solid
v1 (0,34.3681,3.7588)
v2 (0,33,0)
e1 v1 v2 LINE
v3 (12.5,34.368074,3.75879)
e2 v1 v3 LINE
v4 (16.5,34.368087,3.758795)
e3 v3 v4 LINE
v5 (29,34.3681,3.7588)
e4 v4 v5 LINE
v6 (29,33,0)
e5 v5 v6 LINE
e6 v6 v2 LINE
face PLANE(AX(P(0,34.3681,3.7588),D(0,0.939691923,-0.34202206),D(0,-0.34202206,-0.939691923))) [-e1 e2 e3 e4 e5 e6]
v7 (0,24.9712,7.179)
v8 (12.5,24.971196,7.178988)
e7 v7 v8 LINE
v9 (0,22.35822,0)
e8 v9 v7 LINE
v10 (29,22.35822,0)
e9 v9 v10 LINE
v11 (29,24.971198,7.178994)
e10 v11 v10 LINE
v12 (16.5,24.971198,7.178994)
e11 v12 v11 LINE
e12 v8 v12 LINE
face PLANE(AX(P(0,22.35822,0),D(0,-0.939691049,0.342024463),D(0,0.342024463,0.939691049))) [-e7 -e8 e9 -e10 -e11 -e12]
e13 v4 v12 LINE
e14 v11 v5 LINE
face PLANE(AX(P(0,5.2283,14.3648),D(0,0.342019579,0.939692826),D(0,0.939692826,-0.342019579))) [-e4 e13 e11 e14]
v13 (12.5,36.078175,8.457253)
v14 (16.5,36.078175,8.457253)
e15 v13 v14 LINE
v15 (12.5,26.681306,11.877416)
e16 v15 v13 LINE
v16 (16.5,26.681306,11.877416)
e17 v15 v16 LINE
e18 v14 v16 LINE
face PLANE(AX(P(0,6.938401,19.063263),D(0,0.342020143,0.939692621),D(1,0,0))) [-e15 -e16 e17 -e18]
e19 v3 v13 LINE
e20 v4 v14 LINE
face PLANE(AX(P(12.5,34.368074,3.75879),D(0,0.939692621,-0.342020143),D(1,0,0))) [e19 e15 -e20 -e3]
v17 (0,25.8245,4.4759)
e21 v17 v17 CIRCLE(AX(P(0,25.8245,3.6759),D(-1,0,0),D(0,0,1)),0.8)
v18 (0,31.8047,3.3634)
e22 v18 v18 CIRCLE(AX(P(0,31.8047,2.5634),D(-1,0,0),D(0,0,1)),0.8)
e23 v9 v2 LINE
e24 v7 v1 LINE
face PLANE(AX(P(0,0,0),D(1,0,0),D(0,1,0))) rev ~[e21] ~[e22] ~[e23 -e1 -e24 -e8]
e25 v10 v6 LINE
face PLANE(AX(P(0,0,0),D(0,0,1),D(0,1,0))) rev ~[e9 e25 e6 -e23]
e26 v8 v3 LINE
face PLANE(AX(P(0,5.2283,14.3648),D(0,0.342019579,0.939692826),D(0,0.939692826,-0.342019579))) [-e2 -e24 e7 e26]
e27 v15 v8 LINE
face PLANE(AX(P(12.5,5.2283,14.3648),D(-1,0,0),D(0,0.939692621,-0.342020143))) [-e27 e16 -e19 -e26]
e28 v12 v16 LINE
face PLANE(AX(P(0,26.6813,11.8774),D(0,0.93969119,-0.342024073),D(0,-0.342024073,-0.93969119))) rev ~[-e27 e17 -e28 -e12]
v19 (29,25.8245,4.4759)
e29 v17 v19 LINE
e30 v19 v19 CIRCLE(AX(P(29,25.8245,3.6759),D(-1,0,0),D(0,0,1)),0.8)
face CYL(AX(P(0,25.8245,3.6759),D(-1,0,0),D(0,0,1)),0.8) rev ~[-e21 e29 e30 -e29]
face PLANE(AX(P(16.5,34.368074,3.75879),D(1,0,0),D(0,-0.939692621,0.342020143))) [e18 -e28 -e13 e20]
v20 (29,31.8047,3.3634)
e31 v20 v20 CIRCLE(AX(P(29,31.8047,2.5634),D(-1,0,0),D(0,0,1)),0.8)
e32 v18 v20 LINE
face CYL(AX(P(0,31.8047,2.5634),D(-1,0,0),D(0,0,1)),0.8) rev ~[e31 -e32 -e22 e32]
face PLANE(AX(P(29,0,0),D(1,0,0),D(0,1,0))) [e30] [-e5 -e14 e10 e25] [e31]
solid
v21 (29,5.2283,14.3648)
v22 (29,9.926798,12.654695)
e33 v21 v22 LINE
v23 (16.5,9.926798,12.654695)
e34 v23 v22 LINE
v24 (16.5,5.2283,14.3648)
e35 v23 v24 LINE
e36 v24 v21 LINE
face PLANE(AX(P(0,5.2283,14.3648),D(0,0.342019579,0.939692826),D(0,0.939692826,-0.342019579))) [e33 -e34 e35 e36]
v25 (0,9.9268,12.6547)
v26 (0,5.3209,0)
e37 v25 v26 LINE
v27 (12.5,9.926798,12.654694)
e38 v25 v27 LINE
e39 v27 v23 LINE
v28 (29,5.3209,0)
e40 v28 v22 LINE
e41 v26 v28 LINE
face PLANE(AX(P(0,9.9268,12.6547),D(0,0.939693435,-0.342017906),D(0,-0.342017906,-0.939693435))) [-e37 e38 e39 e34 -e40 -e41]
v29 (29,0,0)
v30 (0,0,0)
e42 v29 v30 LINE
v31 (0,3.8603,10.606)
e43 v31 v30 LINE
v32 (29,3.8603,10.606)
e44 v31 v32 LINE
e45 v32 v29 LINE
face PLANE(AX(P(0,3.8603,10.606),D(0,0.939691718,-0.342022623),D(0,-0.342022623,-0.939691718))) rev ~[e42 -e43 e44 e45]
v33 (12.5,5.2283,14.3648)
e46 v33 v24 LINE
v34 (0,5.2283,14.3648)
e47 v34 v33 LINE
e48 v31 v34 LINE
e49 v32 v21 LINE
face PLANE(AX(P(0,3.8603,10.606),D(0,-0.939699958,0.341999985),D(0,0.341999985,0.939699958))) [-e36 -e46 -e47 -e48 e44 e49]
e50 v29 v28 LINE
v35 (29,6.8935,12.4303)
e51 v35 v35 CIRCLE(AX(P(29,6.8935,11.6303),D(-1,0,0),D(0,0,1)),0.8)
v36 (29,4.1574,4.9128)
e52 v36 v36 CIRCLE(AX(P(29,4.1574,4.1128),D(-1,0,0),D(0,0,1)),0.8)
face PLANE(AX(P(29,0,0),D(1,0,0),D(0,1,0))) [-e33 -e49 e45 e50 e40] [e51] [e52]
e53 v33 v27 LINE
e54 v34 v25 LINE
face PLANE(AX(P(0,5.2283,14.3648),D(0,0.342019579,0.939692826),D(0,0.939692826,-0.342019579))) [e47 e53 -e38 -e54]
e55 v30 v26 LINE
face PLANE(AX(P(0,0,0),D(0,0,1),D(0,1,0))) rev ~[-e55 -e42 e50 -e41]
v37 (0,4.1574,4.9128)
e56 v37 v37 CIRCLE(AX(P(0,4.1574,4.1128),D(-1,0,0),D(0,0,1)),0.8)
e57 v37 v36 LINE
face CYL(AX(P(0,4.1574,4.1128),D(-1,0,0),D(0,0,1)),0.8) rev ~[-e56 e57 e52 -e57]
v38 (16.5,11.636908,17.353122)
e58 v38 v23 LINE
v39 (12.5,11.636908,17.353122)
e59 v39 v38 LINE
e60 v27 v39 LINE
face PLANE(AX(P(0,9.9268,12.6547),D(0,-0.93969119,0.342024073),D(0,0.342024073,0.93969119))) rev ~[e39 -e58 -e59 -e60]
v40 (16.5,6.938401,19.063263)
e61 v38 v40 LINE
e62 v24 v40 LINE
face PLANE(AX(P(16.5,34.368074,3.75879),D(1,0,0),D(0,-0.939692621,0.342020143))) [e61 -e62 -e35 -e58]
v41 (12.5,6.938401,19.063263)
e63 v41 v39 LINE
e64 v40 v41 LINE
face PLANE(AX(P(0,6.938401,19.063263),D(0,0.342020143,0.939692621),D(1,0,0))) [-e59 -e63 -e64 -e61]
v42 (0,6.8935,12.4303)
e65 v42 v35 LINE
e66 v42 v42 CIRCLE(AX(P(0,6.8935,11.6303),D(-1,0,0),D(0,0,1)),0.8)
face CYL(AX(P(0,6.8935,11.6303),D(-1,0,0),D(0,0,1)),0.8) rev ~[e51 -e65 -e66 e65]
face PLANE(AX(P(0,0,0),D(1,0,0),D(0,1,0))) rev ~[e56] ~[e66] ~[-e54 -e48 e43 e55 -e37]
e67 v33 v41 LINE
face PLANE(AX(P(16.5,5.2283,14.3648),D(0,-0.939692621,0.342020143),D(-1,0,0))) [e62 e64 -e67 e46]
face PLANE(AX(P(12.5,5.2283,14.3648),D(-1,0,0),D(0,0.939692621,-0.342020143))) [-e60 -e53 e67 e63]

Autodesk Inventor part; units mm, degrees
ref_plane "YZ Plane" through (0, 0, 0) normal (1, 0, 0) x (0, 1, 0)
ref_plane "XZ Plane" through (0, 0, 0) normal (0, 1, 0) x (-1, 0, 0)
ref_plane "XY Plane" through (0, 0, 0) normal (0, 0, 1) x (1, 0, 0)
sketch "スケッチ1" plane through (0, 0, 0) normal (1, 0, 0) x (0, 1, 0)
  line L0 (0, 0) -> (33, 0)
  line L1 (33, 0) -> (3.8603, 10.606)
  line L2 (3.8603, 10.606) -> (0, 0)
  line L3 (33, 0) -> (3.8603, 10.606)
  line L4 (3.8603, 10.606) -> (5.2283, 14.3648)
  line L5 (5.2283, 14.3648) -> (34.3681, 3.7588)
  line L6 (34.3681, 3.7588) -> (33, 0)
  dimension "d0" = 33
  dimension "d1" = 20
  dimension "d2" = 4
extrude "押し出し1" add sketch "スケッチ1" along normal blind 16.5
sketch "スケッチ2" plane through (0, 5.2283, 14.3648) normal (0, 0.3420201, 0.9396926) x (1, 0, 0)
  line L0 (0, 31.0099) -> (16.5, 31.0099) projected
  line L1 (16.5, 31.0099) -> (16.5, 0) projected
  line L2 (12.5, 31.0099) -> (16.5, 31.0099)
  line L3 (16.5, 31.0099) -> (16.5, 0)
  line L4 (16.5, 0) -> (12.5, 0)
  line L5 (12.5, 0) -> (12.5, 31.0099)
  point P0 (0, 0)
  dimension "d5" = 4
extrude "押し出し2" add sketch "スケッチ2" along normal blind 5
extrude "押し出し3" add sketch "スケッチ1" along normal blind 29
sketch "スケッチ3" plane through (0, 0, 0) normal (-1, 0, 0) x (0, 0, 1)
  line L0 (3.7588, 34.3681) -> (14.3648, 5.2283) projected
  line L1 (7.179, 24.9712) -> (12.6547, 9.9268)
  line L2 (12.6547, 9.9268) -> (0, 5.3209)
  line L3 (0, 5.3209) -> (-5.4757, 20.3652)
  line L4 (-5.4757, 20.3652) -> (7.179, 24.9712)
  line L5 (0, 0) -> (0, 33) projected
  line L6 (0, 33) -> (3.7588, 34.3681) projected
  line L7 (14.3648, 5.2283) -> (0, 0) projected
  circle A0 centre (11.6303, 6.8935) radius 0.8
  circle A1 centre (4.1128, 4.1574) radius 0.8
  circle A2 centre (2.5634, 31.8047) radius 0.8
  circle A3 centre (3.6759, 25.8245) radius 0.8
  line L8 (7.179, 24.9712) -> (12.6547, 9.9268)
  line L9 (12.6547, 9.9268) -> (17.3531, 11.6369)
  line L10 (17.3531, 11.6369) -> (11.8774, 26.6813)
  line L11 (11.8774, 26.6813) -> (7.179, 24.9712)
  point P0 (0, 22.3582)
  dimension "d13" = 10
  dimension "d14" = 5
  dimension "d15" = 1.6
  dimension "d16" = 1.6
  dimension "d17" = 1.6
  dimension "d18" = 1.6
  dimension "d19" = 2.5
  dimension "d20" = 2.5
  dimension "d21" = 2
  dimension "d22" = 3
  dimension "d23" = 2
  dimension "d24" = 2
  dimension "d25" = 2
  dimension "d26" = 10
extrude "押し出し4" cut sketch "スケッチ3" against normal through all contours L11 L10 L9 L0 | L0 L2 L5 L4 | L5 L3 L4 | A0 | A1 | A2 | A3
equation "\"d20\" = d19"
properties part number "chest_cover_bace"
